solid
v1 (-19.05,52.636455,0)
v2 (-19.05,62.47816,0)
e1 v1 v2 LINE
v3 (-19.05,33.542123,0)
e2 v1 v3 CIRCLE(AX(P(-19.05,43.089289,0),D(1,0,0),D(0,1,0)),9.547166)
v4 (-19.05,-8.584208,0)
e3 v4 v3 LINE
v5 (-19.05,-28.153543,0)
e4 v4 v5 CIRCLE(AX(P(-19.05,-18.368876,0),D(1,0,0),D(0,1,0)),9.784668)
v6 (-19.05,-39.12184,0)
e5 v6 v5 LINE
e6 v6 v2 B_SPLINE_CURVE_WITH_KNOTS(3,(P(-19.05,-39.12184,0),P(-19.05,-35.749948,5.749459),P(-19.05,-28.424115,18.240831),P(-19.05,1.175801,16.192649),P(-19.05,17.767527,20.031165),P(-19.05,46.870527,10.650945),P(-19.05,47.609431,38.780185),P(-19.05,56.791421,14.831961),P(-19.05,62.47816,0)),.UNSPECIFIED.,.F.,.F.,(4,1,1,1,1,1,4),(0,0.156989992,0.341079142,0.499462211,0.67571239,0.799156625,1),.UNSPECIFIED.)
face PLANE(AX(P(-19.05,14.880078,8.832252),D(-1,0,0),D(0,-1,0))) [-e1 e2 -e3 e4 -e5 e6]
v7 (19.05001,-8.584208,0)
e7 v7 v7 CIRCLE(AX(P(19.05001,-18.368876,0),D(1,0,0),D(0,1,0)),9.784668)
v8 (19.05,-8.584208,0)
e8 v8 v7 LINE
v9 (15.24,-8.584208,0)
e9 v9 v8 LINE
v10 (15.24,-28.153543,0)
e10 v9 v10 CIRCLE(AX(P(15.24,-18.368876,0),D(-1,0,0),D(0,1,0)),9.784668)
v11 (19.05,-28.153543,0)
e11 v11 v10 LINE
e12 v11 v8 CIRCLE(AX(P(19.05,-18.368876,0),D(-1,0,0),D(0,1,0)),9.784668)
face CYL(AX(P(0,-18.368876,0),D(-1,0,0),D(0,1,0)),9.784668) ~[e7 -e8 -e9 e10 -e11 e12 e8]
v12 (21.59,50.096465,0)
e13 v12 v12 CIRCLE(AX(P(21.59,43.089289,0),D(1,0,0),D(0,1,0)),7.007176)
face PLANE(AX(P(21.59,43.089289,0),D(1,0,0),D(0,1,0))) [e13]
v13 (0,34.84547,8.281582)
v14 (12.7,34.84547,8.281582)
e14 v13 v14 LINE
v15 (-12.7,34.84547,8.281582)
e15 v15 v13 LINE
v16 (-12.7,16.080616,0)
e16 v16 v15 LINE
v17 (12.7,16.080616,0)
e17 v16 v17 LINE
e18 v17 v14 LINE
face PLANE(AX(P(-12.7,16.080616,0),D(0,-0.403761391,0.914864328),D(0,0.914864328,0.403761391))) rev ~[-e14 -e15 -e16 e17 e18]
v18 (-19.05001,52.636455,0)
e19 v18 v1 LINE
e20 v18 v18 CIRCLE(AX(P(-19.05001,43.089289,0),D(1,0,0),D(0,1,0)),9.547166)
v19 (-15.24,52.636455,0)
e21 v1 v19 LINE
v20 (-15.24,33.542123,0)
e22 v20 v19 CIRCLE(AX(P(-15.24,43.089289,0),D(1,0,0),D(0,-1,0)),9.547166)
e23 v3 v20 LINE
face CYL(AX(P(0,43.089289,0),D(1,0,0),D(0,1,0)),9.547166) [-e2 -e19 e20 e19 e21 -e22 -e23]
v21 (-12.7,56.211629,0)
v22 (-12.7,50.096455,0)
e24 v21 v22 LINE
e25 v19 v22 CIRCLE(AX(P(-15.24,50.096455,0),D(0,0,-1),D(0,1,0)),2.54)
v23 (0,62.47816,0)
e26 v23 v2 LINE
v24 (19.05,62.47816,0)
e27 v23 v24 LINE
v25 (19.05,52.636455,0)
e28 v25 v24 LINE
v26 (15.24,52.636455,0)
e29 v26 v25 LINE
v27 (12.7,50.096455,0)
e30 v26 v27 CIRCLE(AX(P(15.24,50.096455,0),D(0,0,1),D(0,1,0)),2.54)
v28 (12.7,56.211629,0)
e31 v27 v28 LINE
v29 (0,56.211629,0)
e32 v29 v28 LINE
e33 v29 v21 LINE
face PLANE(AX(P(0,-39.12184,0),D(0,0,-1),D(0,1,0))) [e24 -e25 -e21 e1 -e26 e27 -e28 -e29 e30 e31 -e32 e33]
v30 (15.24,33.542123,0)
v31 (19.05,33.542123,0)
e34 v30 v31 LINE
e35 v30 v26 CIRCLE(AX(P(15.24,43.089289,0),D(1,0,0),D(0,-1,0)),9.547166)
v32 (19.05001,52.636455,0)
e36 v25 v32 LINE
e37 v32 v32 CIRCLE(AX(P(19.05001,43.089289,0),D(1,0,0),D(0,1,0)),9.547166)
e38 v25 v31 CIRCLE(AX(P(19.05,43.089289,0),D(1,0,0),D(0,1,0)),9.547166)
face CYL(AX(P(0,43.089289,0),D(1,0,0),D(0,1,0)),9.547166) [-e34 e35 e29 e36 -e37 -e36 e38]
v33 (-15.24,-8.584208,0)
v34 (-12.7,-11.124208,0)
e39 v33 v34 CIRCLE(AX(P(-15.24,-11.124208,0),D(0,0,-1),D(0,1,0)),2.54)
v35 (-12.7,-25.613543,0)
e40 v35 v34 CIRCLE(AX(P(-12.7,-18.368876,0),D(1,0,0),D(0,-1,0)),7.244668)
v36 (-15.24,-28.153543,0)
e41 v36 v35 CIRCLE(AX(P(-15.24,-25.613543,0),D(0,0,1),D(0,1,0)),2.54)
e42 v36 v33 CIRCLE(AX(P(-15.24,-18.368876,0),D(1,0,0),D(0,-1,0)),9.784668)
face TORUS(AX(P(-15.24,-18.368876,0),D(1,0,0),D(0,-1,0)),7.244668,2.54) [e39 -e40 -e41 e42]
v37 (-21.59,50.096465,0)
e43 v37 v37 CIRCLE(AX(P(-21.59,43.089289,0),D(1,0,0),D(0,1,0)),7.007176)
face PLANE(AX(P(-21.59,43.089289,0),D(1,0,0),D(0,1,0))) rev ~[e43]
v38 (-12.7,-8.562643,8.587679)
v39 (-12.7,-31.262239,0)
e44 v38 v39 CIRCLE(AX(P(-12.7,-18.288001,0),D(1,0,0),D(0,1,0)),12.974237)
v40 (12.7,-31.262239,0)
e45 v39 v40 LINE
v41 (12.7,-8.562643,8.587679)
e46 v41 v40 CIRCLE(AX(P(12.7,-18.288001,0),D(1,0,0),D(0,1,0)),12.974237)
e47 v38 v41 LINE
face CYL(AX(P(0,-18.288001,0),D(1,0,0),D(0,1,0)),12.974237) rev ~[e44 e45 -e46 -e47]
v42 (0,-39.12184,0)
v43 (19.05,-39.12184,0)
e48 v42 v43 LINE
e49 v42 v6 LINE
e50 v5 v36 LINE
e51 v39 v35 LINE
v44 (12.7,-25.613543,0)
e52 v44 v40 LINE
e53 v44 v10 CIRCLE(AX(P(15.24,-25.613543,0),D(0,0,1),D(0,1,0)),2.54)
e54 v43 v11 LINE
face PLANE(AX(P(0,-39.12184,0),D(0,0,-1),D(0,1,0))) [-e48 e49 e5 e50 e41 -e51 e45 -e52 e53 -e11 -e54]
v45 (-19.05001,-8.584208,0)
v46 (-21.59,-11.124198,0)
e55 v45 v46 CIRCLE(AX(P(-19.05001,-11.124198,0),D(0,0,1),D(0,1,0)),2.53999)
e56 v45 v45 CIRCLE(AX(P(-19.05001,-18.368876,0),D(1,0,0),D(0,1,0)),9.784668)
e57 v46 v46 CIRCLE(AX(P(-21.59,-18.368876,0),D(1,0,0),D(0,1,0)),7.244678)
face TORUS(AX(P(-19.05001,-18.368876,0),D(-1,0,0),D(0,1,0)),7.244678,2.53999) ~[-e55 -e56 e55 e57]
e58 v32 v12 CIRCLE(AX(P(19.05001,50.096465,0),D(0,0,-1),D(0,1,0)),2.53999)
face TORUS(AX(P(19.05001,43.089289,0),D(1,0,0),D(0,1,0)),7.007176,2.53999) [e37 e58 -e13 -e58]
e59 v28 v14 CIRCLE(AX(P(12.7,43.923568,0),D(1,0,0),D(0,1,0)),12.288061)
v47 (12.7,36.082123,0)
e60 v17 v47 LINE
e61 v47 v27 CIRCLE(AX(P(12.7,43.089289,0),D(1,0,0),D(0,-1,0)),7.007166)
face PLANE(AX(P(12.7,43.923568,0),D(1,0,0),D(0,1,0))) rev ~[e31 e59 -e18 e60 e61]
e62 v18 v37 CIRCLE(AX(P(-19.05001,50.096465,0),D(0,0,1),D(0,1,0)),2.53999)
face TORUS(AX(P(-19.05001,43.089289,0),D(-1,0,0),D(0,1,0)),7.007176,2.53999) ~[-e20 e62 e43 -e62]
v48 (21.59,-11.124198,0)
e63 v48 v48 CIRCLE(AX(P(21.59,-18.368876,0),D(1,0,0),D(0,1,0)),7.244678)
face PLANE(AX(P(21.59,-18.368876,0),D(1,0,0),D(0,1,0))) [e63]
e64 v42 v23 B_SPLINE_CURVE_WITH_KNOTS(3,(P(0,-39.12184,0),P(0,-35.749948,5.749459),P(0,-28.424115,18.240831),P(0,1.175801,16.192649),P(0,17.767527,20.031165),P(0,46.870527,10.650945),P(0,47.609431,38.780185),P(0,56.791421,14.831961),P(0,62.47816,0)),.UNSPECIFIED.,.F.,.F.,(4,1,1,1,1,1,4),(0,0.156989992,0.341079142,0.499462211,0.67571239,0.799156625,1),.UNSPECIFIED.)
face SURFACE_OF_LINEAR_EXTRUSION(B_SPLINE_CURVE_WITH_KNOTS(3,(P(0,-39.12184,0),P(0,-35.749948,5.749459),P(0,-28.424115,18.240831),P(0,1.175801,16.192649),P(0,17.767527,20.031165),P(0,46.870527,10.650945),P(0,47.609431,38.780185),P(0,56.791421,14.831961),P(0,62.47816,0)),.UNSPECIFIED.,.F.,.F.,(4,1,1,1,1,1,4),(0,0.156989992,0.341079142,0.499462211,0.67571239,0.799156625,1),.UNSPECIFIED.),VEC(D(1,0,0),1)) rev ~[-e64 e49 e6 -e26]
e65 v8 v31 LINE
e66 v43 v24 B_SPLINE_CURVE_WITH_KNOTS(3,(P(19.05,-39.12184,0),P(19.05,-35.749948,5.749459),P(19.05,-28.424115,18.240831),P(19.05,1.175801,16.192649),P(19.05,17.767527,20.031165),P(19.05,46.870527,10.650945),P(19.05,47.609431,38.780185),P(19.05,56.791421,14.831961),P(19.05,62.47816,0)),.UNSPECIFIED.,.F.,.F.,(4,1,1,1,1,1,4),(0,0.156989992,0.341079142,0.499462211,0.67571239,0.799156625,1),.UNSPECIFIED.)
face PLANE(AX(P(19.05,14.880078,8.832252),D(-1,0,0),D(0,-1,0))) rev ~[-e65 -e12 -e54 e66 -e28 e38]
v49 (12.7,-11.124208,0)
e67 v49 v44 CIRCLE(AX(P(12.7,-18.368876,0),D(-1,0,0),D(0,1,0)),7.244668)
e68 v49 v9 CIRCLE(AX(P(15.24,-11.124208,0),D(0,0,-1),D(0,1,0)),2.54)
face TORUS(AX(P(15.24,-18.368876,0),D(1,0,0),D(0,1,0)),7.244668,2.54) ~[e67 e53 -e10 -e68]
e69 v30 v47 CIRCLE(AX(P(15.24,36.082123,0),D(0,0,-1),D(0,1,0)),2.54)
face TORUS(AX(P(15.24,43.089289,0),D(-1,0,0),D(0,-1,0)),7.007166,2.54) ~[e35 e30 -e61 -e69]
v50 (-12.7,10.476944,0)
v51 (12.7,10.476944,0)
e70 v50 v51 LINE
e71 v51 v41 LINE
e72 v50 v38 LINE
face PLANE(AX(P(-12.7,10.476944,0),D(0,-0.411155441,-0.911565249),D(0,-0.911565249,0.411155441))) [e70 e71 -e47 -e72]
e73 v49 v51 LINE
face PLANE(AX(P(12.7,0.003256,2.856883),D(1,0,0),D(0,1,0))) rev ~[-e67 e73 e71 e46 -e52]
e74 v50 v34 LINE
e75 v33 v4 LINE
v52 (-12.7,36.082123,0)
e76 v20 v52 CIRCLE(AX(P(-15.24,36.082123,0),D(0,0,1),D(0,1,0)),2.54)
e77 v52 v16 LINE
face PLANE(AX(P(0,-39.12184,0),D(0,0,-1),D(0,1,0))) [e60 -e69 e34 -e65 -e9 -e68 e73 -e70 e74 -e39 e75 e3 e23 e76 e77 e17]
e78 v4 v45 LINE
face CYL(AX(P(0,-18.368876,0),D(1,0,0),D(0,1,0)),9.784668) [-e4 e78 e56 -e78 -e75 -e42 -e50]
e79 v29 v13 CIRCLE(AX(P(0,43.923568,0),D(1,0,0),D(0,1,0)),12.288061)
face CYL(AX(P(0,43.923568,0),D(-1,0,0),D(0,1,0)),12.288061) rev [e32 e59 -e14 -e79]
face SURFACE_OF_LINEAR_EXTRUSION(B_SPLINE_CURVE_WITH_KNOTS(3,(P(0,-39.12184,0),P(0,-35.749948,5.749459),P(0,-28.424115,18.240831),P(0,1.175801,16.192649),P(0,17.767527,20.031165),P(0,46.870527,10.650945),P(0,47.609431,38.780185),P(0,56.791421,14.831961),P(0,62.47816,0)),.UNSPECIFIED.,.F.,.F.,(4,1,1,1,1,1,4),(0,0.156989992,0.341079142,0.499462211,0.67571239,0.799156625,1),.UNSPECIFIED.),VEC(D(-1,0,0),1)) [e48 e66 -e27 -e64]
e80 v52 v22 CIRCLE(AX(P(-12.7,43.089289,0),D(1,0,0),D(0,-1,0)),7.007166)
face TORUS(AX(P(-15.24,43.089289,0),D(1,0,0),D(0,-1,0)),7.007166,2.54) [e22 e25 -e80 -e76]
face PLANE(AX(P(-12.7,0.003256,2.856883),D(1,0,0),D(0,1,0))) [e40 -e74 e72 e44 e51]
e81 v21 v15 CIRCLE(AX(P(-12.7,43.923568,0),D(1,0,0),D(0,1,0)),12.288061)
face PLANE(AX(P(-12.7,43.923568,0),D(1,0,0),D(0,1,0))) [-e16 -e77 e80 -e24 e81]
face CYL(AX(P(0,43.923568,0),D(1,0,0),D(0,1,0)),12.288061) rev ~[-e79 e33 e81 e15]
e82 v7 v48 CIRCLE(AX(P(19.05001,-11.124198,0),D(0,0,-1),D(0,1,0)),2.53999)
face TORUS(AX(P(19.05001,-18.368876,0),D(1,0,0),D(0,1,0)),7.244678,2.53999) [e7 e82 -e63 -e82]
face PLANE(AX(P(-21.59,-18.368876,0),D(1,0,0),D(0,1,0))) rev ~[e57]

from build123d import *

# Parameters (mm, degrees)
F2_DEPTH    = 19.05
F1_R        = 9.7846675991
F1_R_2      = 9.5471660414
F3_DEPTH    = 21.59
F4_R        = 2.53999
F5_R        = 12.2880612675
F5_R_2      = 12.9742372855
F6_DEPTH    = 12.7
F7_T1_DEPTH = 25.4
F8_R        = 2.54


# Not quite as in the source:
# - a fillet or chamfer that OpenCascade refuses, or shapes differently, is made with other operations: its cross-section is extruded or revolved along the edge and cut away or added
# - a fillet or chamfer is up to 0.001 mm smaller than in the source, because OpenCascade refuses the exact size


with BuildPart() as f2:
    # F0 (on Right) → F2 (new body, symmetric)
    with BuildSketch(Plane.YZ):
        with BuildLine():
            add(Edge.make_bspline(
                [(-39.1218404372, 0), (-35.7499481543, 5.7494593291), (-28.4241148656, 18.2408313222), (1.1758009443, 16.1926491207), (17.7675274811, 20.0311651733), (46.8705269237, 10.6509447037), (47.6094306141, 38.7801853041), (56.7914214175, 14.8319607892), (62.4781595628, 0)],
                knots=[0, 0, 0, 0, 0.1569899924, 0.3410791415, 0.4994622113, 0.67571239, 0.7991566251, 1, 1, 1, 1], degree=3))
            Line((-39.1218404372, 0), (62.4781595628, 0))
        make_face()
    extrude(amount=F2_DEPTH, both=True)

    # F1 (on Right) → F3 (join, symmetric)
    with BuildSketch(Plane.YZ):
        with Locations((-18.3688756078, 0)):
            Circle(F1_R)
        with Locations((43.0892892182, 0)):
            Circle(F1_R_2)
    extrude(amount=F3_DEPTH, both=True)

    # F4 (radius 2.54 in the source; OpenCascade refuses exactly that, so slightly less here)
    f4_edges = [f2.edges().sort_by_distance(p)[0] for p in [
        (21.59, -28.153543, 0),
        (21.59, 33.542123, 0),
        (-21.59, -28.153543, 0),
        (-21.59, 33.542123, 0),
    ]]
    fillet(f4_edges, radius=F4_R)

    # F5 (on Right) → F6 (cut, symmetric)
    with BuildSketch(Plane.YZ):
        with Locations((43.9235679805, 0)):
            Circle(F5_R)
        with Locations((-18.2880014181, 0)):
            Circle(F5_R_2)
    extrude(amount=F6_DEPTH, both=True, mode=Mode.SUBTRACT)

    # F7: chamfer of 25.4 on 2 edges, made by hand

    # F7_s2 → F7_t1 (cut)
    with BuildSketch(Plane.YZ.offset(-12.7)):
        with BuildLine():
            Line((16.0806162314, 0), (34.8454704224, 8.2815816388))
            ThreePointArc((34.8454704224, 8.2815816388), (32.6157253693, 4.8092769929), (31.635506713, 0))
            Line((31.635506713, 0), (16.0806162314, 0))
        make_face()
        with BuildLine():
            Line((10.4769440406, 0), (-8.5626425762, 8.5876788794))
            ThreePointArc((-8.5626425762, 8.5876788794), (-6.2987535844, 4.9587064362), (-5.3137641326, 0))
            Line((-5.3137641326, 0), (10.4769440406, 0))
        make_face()
    extrude(amount=F7_T1_DEPTH, mode=Mode.SUBTRACT)

    # F8
    f8_edges = [f2.edges().sort_by_distance(p)[0] for p in [
        (-12.7, 43.089289, -9.547166),
        (-12.7, -18.368876, -9.784668),
        (12.7, 43.089289, -9.547166),
        (12.7, -18.368876, -9.784668),
    ]]
    fillet(f8_edges, radius=F8_R)


solid = f2.part
